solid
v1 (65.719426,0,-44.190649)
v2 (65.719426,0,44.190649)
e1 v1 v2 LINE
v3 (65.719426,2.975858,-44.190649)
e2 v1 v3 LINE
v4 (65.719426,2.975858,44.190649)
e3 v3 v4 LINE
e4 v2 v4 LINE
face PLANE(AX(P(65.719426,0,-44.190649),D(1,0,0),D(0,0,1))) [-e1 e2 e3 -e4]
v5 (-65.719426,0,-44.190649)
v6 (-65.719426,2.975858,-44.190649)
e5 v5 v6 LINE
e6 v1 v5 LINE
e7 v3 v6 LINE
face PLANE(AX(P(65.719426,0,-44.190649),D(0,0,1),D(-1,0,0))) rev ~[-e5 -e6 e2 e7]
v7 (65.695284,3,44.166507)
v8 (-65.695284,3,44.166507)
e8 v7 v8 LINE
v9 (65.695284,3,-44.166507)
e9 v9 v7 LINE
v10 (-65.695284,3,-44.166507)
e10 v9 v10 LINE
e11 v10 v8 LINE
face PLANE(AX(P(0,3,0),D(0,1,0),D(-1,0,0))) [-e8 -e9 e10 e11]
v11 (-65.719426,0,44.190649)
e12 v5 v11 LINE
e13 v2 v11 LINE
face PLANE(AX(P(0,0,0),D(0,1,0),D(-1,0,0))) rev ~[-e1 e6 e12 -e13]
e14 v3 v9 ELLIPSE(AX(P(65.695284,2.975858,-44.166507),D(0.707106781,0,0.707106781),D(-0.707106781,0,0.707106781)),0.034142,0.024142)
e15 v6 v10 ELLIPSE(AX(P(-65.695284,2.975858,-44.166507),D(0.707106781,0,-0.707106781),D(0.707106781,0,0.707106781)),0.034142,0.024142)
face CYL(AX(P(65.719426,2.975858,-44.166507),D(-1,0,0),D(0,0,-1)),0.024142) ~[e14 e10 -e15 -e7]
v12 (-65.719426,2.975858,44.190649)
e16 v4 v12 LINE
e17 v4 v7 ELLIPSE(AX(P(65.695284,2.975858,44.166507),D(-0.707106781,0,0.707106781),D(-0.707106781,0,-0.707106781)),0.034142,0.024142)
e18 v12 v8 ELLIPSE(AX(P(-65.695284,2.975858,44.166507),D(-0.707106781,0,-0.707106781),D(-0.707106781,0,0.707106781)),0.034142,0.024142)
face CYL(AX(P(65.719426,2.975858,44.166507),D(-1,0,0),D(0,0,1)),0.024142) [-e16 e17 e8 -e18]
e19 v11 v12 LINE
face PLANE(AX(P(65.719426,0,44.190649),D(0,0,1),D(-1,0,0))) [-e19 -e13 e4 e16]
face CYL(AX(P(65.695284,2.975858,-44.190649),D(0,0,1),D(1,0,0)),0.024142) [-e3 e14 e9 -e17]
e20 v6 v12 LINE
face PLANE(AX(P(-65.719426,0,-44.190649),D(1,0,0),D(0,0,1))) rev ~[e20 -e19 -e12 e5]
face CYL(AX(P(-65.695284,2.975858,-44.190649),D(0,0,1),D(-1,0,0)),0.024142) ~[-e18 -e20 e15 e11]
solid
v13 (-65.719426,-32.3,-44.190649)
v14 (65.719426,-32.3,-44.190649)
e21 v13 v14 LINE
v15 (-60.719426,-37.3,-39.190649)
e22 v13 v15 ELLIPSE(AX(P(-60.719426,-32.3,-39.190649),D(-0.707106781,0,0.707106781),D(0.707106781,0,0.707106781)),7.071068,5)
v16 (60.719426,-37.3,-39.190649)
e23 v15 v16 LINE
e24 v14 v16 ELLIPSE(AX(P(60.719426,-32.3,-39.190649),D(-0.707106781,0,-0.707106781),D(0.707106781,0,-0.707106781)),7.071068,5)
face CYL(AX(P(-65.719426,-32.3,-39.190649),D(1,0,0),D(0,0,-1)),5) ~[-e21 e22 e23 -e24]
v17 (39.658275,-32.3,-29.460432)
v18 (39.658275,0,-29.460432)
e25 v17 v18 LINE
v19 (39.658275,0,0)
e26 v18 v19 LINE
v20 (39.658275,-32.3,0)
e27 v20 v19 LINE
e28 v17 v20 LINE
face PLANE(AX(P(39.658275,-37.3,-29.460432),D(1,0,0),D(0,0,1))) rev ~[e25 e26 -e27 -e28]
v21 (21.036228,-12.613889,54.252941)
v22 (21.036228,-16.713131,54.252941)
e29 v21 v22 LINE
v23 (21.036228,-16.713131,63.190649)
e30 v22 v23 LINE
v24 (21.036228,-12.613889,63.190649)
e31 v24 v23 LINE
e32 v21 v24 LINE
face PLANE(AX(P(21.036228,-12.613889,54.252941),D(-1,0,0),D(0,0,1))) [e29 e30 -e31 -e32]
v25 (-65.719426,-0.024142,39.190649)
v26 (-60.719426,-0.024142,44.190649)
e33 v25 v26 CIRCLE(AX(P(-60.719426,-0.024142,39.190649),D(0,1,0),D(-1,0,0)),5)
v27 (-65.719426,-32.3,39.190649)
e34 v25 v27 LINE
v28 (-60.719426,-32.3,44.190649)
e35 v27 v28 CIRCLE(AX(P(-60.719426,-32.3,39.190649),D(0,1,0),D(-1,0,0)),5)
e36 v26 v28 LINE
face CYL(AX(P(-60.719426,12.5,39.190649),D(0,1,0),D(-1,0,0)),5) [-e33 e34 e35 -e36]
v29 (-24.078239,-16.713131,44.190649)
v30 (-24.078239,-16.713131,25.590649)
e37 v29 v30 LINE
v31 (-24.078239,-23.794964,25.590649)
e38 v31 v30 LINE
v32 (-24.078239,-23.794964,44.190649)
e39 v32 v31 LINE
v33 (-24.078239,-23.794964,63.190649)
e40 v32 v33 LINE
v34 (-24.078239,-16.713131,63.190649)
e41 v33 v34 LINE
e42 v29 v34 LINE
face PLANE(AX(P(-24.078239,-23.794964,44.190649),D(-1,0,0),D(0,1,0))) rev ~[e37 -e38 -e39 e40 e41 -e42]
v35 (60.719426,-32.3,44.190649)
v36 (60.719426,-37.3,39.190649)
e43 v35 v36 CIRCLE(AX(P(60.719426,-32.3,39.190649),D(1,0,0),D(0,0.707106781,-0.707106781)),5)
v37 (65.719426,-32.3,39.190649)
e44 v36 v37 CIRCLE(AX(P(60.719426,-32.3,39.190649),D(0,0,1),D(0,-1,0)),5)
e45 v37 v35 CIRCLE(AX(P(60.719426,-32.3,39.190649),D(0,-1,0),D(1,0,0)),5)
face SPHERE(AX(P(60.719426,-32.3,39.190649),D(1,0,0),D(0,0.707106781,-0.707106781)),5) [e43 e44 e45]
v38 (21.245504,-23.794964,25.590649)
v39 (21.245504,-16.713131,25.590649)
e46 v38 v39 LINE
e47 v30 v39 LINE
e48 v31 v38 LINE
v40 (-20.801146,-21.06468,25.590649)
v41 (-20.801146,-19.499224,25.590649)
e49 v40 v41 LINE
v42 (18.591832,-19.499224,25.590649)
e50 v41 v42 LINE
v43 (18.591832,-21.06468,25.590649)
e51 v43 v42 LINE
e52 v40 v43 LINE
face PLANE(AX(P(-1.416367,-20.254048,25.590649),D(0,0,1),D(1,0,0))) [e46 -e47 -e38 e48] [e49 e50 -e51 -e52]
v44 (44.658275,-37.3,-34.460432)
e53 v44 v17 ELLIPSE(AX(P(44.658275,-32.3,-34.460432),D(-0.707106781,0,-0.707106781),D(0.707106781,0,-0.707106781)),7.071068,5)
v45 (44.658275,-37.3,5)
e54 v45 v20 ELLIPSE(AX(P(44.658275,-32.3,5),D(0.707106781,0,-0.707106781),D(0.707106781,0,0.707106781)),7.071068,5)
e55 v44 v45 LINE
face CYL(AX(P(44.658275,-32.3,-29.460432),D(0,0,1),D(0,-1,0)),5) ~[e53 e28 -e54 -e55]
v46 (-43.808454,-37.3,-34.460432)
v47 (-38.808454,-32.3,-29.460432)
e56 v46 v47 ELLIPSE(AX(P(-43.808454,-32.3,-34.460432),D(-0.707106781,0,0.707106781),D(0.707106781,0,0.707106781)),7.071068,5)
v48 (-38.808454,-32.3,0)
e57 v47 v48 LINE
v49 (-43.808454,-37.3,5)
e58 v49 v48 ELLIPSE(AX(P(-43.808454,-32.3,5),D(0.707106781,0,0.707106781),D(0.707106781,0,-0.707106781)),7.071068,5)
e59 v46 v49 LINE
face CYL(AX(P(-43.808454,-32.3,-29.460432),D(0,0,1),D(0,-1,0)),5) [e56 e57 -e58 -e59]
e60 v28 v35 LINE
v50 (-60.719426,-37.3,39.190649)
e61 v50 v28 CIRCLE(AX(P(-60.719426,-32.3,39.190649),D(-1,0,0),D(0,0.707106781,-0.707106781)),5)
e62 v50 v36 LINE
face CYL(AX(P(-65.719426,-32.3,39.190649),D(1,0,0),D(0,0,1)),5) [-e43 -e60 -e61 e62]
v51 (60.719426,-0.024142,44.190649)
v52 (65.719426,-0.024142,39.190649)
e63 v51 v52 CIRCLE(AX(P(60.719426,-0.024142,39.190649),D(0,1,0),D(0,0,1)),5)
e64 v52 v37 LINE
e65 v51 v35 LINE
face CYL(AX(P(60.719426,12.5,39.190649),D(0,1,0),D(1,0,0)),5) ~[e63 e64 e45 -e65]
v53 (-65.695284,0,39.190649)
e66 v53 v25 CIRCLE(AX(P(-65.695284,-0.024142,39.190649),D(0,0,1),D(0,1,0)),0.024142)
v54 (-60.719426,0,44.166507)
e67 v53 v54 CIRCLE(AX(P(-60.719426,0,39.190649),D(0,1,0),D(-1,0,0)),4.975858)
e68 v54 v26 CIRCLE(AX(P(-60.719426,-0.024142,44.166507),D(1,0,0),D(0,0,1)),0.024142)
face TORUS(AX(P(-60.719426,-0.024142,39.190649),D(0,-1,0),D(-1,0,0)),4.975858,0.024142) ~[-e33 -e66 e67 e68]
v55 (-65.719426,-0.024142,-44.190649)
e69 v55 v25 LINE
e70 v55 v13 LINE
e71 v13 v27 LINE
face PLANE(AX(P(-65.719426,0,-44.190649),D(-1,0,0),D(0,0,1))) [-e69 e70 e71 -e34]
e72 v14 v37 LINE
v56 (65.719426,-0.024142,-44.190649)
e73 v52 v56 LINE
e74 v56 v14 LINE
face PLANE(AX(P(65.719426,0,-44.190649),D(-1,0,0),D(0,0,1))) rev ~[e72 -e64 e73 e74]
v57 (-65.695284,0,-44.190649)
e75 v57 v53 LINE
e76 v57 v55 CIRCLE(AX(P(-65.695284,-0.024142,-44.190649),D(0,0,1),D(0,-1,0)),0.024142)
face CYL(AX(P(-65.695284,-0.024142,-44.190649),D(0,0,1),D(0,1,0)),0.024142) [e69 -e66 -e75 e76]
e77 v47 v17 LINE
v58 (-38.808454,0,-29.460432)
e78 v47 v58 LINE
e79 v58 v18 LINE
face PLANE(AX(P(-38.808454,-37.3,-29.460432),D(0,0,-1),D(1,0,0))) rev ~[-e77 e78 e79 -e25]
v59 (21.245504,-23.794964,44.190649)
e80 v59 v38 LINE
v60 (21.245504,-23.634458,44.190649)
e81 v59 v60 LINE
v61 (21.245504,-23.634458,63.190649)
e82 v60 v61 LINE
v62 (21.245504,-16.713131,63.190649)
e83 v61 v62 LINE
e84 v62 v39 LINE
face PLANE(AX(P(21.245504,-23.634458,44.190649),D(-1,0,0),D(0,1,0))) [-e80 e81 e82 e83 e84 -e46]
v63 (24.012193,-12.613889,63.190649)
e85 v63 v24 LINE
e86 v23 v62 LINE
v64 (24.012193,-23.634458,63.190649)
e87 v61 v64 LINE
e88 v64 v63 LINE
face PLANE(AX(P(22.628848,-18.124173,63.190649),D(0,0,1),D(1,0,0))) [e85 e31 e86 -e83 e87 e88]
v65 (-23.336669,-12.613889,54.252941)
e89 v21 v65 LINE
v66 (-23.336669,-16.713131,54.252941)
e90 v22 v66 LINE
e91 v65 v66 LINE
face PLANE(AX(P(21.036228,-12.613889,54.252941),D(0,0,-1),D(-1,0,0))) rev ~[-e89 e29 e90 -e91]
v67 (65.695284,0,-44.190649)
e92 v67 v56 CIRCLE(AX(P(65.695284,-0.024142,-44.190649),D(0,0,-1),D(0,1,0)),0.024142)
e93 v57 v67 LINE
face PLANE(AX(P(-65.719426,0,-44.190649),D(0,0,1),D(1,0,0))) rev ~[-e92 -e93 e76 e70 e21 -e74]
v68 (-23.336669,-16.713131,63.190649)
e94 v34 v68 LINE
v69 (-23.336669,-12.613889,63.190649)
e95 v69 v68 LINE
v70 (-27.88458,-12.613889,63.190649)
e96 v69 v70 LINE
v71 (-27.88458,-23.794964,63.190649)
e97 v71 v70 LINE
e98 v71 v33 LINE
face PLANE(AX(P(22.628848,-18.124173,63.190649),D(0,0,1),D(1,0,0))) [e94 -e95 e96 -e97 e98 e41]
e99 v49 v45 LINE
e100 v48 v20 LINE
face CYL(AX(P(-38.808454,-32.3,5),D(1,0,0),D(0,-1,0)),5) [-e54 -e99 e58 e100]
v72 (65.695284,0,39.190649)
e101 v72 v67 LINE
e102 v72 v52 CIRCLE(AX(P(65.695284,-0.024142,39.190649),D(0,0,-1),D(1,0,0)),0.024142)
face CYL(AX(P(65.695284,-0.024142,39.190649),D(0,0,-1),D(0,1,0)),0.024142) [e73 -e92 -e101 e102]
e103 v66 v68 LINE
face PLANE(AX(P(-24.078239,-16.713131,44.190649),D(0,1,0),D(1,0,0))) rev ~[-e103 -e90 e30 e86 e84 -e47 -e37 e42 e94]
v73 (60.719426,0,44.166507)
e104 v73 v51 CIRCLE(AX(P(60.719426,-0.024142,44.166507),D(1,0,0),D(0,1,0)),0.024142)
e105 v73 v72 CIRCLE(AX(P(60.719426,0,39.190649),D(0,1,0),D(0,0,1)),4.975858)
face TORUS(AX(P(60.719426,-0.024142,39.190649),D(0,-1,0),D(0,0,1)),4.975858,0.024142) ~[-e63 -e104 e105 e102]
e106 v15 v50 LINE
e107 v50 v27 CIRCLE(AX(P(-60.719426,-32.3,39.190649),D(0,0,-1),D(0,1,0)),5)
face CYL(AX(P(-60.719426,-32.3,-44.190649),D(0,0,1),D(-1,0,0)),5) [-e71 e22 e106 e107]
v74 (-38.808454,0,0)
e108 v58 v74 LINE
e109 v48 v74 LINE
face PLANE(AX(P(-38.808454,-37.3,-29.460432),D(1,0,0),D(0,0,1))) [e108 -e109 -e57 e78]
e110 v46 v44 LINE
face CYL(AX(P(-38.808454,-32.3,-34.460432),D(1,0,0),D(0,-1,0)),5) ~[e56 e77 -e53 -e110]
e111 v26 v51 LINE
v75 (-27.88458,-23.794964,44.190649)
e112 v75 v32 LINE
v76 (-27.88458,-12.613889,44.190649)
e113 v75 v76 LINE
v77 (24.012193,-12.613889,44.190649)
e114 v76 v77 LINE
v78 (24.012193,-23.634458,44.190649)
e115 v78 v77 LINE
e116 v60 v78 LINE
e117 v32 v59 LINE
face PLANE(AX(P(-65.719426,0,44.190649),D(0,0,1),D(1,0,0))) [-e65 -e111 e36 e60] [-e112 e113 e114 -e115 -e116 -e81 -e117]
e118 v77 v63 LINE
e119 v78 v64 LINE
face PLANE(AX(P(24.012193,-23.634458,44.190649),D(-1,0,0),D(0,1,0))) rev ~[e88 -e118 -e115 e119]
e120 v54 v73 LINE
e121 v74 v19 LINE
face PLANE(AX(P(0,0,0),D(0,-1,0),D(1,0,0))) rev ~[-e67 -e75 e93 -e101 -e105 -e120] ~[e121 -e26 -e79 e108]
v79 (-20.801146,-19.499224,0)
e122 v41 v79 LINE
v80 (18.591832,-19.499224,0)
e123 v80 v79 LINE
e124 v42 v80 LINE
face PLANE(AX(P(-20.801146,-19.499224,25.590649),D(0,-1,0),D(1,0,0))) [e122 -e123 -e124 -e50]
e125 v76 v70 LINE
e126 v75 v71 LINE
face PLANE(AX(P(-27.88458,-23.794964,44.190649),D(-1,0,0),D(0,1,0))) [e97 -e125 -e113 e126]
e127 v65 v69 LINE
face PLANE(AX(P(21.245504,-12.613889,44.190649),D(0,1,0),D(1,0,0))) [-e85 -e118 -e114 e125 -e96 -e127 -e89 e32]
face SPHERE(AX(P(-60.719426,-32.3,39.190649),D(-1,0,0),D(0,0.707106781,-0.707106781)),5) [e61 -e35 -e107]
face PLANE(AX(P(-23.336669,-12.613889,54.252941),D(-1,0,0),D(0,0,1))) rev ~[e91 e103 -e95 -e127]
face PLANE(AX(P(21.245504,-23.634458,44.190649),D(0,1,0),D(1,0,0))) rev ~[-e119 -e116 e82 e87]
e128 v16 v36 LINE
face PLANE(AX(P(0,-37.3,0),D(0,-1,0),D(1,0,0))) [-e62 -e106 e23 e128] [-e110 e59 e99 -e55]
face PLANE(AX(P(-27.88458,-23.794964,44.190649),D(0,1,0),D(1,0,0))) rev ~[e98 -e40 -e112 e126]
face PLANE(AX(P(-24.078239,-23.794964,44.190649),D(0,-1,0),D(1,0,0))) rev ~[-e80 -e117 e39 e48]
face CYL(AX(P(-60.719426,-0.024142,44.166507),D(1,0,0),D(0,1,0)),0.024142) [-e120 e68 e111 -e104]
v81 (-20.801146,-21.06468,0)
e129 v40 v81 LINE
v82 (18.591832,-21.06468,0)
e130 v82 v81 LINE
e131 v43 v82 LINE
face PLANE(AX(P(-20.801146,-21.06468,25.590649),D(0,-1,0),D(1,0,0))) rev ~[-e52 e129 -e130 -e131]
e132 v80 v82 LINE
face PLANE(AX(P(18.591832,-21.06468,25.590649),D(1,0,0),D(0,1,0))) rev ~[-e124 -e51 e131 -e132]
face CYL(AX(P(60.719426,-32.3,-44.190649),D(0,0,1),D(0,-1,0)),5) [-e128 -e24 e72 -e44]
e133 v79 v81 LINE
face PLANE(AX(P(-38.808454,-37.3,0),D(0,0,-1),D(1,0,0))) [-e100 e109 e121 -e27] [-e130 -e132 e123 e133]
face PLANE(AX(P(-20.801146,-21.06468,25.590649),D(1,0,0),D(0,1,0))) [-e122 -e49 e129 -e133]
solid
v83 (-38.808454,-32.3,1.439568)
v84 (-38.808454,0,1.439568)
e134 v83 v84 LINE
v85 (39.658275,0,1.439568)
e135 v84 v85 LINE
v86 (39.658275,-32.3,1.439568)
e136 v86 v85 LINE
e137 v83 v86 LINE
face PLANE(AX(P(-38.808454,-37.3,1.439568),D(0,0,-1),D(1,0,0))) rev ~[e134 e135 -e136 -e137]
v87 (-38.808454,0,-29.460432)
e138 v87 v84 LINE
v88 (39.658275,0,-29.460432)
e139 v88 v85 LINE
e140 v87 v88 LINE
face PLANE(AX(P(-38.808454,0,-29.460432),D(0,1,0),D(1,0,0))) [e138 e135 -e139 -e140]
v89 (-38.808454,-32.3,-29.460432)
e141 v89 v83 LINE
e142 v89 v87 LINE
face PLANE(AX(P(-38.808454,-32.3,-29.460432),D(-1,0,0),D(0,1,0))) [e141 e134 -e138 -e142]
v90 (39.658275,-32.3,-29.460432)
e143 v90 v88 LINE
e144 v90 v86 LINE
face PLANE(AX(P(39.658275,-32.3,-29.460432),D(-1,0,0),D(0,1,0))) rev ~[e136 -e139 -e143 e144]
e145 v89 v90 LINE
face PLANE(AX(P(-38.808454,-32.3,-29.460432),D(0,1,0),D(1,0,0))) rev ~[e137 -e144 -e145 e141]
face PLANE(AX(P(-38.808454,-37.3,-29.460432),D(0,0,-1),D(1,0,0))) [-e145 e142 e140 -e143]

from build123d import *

# Parameters (mm, degrees)
F0_W          = 131.4388513565
F0_H          = 88.3812978864
F1_DEPTH      = 37.3
F2_W          = 78.4667283297
F2_H          = 29.4604320079
F3_DEPTH      = 61.4
F4_R          = 5
F5_W          = 131.4388513565
F5_H          = 88.3812978864
F6_DEPTH      = 3
F7_W          = 45.3237425536
F7_H          = 7.0818327367
F8_DEPTH      = 18.6
F9_W          = 39.392977953
F9_H          = 1.5654563904
F10_DEPTH     = 50.6
F11_T1_DEPTH  = 44.8
F11_S5_W      = 5
F11_S5_H      = 5
F11_T6_DEPTH  = 5
F11_S11_W     = 5
F11_S11_H     = 5
F11_T12_DEPTH = 5
F12_R         = 0.0241421356
F12_2_R       = 0.0241421356
F13_W         = 45.3237425536
F13_H         = 4.0992423892
F14_DEPTH     = 19
F15_W         = 3.8063414395
F15_H         = 11.1810751259
F16_DEPTH     = 19
F17_W         = 2.7666892856
F17_H         = 11.0205691308
F18_DEPTH     = 19
F19_W         = 44.3728975952
F19_H         = 8.9377077818
F20_DEPTH     = 25
F21_DEPTH     = 30.9


# Not quite as in the source:
# - a fillet or chamfer that OpenCascade refuses, or shapes differently, is made with other operations: its cross-section is extruded or revolved along the edge and cut away or added


with BuildPart() as f1:
    # F0 (on Front) → F1 (new body)
    with BuildSketch(Plane.XZ):
        Rectangle(F0_W, F0_H)
    extrude(amount=F1_DEPTH)

    # F2 (on face) → F3 (cut)
    with BuildSketch(Plane.XZ.offset(37.3)):
        with Locations((0.4249103367, -14.730216004)):
            Rectangle(F2_W, F2_H)
    extrude(amount=-F3_DEPTH, mode=Mode.SUBTRACT)

    # F4
    f4_edges = [f1.edges().sort_by_distance(p)[0] for p in [
        (0, -37.3, -44.190649),
        (-65.719426, -37.3, 0),
        (65.719426, -37.3, 0),
        (0, -37.3, 44.190649),
        (0.42491, -37.3, 0),
        (-38.808454, -37.3, -14.730216),
        (0.42491, -37.3, -29.460432),
        (39.658275, -37.3, -14.730216),
    ]]
    fillet(f4_edges, radius=F4_R)

    # F7 (on face) → F8 (cut)
    with BuildSketch(Plane.XY.offset(44.1906489432)):
        with Locations((-1.4163674787, -20.2540475875)):
            Rectangle(F7_W, F7_H)
    extrude(amount=-F8_DEPTH, mode=Mode.SUBTRACT)

    # F9 (on face) → F10 (cut)
    with BuildSketch(Plane.XY.offset(25.5906489432)):
        with Locations((-1.1046566069, -20.2819518745)):
            Rectangle(F9_W, F9_H)
    extrude(amount=-F10_DEPTH, mode=Mode.SUBTRACT)

    # F11: fillet of radius 5 on 2 edges, made by hand

    # F11_s2 → F11_t1 (cut)
    with BuildSketch(Plane.XZ.offset(-12.5)):
        with BuildLine():
            ThreePointArc((65.7194256783, 39.1906489432), (64.2549595842, 42.7261828491), (60.7194256783, 44.1906489432))
            Line((60.7194256783, 44.1906489432), (65.7194256783, 44.1906489432))
            Line((65.7194256783, 44.1906489432), (65.7194256783, 39.1906489432))
        make_face()
        with BuildLine():
            ThreePointArc((-65.7194256783, 39.1906489432), (-64.2549595842, 42.7261828491), (-60.7194256783, 44.1906489432))
            Line((-60.7194256783, 44.1906489432), (-65.7194256783, 44.1906489432))
            Line((-65.7194256783, 44.1906489432), (-65.7194256783, 39.1906489432))
        make_face()
    extrude(amount=F11_T1_DEPTH, mode=Mode.SUBTRACT)


with BuildPart() as f6:
    # F5 (on face) → F6 (new body)
    with BuildSketch(Plane(origin=(0, 0, 0), x_dir=(-1, 0, 0), z_dir=(0, 1, 0))):
        Rectangle(F5_W, F5_H)
    extrude(amount=F6_DEPTH)

    # F12
    f12_edges = [f6.edges().sort_by_distance(p)[0] for p in [
        (-65.719426, 3, 0),
        (0, 3, 44.190649),
        (65.719426, 3, 0),
        (0, 3, -44.190649),
    ]]
    fillet(f12_edges, radius=F12_R)


with BuildPart() as f11_tool4:
    # F11_s5 → F11_t6 (new body)
    with BuildSketch(Plane.YZ.offset(-60.7194256783)):
        with Locations((-34.8, 41.6906489432)):
            Rectangle(F11_S5_W, F11_S5_H)
    extrude(amount=-F11_T6_DEPTH)

    # F11_s7 → F11_t8 (revolve, cut)
    with BuildSketch(Plane(origin=(-60.7194256783, -32.3, 39.1906489432), x_dir=(0, 0.7071067812, -0.7071067812), z_dir=(0, 0.7071067812, 0.7071067812))):
        with BuildLine():
            ThreePointArc((0, -5), (5, 0), (0, 5))
            Line((0, 5), (0, -5))
        make_face()
    revolve(axis=Axis((-60.7194256783, -32.3, 39.1906489432), (-1, 0, 0)), mode=Mode.SUBTRACT)


with BuildPart() as f1_1:
    add(f1.part)

    # F11_t3: cut F11_tool4
    add(f11_tool4.part, mode=Mode.SUBTRACT)


with BuildPart() as f11_tool10:
    # F11_s11 → F11_t12 (new body)
    with BuildSketch(Plane.YZ.offset(60.7194256783)):
        with Locations((-34.8, 41.6906489432)):
            Rectangle(F11_S11_W, F11_S11_H)
    extrude(amount=F11_T12_DEPTH)

    # F11_s13 → F11_t14 (revolve, cut)
    with BuildSketch(Plane(origin=(60.7194256783, -32.3, 39.1906489432), x_dir=(0, 0.7071067812, -0.7071067812), z_dir=(0, -0.7071067812, -0.7071067812))):
        with BuildLine():
            ThreePointArc((0, -5), (5, 0), (0, 5))
            Line((0, 5), (0, -5))
        make_face()
    revolve(axis=Axis((60.7194256783, -32.3, 39.1906489432), (1, 0, 0)), mode=Mode.SUBTRACT)


with BuildPart() as f1_2:
    add(f1_1.part)

    # F11_t9: cut F11_tool10
    add(f11_tool10.part, mode=Mode.SUBTRACT)

    # F12#2
    f12_2_edges = [f1_2.edges().sort_by_distance(p)[0] for p in [
        (64.25496, 0, 42.726183),
        (-64.25496, 0, 42.726183),
    ]]
    fillet(f12_2_edges, radius=F12_2_R)

    # F13 (on face) → F14 (join)
    with BuildSketch(Plane.XY.offset(44.1906489432)):
        with Locations((-1.4163674787, -14.6635100245)):
            Rectangle(F13_W, F13_H)
    extrude(amount=F14_DEPTH)

    # F15 (on face) → F16 (join)
    with BuildSketch(Plane.XY.offset(44.1906489432)):
        with Locations((-25.9814094752, -18.2044263929)):
            Rectangle(F15_W, F15_H)
    extrude(amount=F16_DEPTH)

    # F17 (on face) → F18 (join)
    with BuildSketch(Plane.XY.offset(44.1906489432)):
        with Locations((22.6288484409, -18.1241733953)):
            Rectangle(F17_W, F17_H)
    extrude(amount=F18_DEPTH)

    # F19 (on face) → F20 (cut)
    with BuildSketch(Plane(origin=(0, -12.6138888299, 0), x_dir=(-1, 0, 0), z_dir=(0, 1, 0))):
        with Locations((1.1502206326, 58.7217950523)):
            Rectangle(F19_W, F19_H)
    extrude(amount=-F20_DEPTH, mode=Mode.SUBTRACT)


with BuildPart() as f21:
    # F21 (new): a face of the model
    f21_faces = [f1_2.part.faces().sort_by_distance(p)[0] for p in [
        (0.4249103367, -16.15, -29.4604320079),
    ]]
    extrude(f21_faces, amount=F21_DEPTH)


solid = Compound([f6.part, f1_2.part, f21.part])
